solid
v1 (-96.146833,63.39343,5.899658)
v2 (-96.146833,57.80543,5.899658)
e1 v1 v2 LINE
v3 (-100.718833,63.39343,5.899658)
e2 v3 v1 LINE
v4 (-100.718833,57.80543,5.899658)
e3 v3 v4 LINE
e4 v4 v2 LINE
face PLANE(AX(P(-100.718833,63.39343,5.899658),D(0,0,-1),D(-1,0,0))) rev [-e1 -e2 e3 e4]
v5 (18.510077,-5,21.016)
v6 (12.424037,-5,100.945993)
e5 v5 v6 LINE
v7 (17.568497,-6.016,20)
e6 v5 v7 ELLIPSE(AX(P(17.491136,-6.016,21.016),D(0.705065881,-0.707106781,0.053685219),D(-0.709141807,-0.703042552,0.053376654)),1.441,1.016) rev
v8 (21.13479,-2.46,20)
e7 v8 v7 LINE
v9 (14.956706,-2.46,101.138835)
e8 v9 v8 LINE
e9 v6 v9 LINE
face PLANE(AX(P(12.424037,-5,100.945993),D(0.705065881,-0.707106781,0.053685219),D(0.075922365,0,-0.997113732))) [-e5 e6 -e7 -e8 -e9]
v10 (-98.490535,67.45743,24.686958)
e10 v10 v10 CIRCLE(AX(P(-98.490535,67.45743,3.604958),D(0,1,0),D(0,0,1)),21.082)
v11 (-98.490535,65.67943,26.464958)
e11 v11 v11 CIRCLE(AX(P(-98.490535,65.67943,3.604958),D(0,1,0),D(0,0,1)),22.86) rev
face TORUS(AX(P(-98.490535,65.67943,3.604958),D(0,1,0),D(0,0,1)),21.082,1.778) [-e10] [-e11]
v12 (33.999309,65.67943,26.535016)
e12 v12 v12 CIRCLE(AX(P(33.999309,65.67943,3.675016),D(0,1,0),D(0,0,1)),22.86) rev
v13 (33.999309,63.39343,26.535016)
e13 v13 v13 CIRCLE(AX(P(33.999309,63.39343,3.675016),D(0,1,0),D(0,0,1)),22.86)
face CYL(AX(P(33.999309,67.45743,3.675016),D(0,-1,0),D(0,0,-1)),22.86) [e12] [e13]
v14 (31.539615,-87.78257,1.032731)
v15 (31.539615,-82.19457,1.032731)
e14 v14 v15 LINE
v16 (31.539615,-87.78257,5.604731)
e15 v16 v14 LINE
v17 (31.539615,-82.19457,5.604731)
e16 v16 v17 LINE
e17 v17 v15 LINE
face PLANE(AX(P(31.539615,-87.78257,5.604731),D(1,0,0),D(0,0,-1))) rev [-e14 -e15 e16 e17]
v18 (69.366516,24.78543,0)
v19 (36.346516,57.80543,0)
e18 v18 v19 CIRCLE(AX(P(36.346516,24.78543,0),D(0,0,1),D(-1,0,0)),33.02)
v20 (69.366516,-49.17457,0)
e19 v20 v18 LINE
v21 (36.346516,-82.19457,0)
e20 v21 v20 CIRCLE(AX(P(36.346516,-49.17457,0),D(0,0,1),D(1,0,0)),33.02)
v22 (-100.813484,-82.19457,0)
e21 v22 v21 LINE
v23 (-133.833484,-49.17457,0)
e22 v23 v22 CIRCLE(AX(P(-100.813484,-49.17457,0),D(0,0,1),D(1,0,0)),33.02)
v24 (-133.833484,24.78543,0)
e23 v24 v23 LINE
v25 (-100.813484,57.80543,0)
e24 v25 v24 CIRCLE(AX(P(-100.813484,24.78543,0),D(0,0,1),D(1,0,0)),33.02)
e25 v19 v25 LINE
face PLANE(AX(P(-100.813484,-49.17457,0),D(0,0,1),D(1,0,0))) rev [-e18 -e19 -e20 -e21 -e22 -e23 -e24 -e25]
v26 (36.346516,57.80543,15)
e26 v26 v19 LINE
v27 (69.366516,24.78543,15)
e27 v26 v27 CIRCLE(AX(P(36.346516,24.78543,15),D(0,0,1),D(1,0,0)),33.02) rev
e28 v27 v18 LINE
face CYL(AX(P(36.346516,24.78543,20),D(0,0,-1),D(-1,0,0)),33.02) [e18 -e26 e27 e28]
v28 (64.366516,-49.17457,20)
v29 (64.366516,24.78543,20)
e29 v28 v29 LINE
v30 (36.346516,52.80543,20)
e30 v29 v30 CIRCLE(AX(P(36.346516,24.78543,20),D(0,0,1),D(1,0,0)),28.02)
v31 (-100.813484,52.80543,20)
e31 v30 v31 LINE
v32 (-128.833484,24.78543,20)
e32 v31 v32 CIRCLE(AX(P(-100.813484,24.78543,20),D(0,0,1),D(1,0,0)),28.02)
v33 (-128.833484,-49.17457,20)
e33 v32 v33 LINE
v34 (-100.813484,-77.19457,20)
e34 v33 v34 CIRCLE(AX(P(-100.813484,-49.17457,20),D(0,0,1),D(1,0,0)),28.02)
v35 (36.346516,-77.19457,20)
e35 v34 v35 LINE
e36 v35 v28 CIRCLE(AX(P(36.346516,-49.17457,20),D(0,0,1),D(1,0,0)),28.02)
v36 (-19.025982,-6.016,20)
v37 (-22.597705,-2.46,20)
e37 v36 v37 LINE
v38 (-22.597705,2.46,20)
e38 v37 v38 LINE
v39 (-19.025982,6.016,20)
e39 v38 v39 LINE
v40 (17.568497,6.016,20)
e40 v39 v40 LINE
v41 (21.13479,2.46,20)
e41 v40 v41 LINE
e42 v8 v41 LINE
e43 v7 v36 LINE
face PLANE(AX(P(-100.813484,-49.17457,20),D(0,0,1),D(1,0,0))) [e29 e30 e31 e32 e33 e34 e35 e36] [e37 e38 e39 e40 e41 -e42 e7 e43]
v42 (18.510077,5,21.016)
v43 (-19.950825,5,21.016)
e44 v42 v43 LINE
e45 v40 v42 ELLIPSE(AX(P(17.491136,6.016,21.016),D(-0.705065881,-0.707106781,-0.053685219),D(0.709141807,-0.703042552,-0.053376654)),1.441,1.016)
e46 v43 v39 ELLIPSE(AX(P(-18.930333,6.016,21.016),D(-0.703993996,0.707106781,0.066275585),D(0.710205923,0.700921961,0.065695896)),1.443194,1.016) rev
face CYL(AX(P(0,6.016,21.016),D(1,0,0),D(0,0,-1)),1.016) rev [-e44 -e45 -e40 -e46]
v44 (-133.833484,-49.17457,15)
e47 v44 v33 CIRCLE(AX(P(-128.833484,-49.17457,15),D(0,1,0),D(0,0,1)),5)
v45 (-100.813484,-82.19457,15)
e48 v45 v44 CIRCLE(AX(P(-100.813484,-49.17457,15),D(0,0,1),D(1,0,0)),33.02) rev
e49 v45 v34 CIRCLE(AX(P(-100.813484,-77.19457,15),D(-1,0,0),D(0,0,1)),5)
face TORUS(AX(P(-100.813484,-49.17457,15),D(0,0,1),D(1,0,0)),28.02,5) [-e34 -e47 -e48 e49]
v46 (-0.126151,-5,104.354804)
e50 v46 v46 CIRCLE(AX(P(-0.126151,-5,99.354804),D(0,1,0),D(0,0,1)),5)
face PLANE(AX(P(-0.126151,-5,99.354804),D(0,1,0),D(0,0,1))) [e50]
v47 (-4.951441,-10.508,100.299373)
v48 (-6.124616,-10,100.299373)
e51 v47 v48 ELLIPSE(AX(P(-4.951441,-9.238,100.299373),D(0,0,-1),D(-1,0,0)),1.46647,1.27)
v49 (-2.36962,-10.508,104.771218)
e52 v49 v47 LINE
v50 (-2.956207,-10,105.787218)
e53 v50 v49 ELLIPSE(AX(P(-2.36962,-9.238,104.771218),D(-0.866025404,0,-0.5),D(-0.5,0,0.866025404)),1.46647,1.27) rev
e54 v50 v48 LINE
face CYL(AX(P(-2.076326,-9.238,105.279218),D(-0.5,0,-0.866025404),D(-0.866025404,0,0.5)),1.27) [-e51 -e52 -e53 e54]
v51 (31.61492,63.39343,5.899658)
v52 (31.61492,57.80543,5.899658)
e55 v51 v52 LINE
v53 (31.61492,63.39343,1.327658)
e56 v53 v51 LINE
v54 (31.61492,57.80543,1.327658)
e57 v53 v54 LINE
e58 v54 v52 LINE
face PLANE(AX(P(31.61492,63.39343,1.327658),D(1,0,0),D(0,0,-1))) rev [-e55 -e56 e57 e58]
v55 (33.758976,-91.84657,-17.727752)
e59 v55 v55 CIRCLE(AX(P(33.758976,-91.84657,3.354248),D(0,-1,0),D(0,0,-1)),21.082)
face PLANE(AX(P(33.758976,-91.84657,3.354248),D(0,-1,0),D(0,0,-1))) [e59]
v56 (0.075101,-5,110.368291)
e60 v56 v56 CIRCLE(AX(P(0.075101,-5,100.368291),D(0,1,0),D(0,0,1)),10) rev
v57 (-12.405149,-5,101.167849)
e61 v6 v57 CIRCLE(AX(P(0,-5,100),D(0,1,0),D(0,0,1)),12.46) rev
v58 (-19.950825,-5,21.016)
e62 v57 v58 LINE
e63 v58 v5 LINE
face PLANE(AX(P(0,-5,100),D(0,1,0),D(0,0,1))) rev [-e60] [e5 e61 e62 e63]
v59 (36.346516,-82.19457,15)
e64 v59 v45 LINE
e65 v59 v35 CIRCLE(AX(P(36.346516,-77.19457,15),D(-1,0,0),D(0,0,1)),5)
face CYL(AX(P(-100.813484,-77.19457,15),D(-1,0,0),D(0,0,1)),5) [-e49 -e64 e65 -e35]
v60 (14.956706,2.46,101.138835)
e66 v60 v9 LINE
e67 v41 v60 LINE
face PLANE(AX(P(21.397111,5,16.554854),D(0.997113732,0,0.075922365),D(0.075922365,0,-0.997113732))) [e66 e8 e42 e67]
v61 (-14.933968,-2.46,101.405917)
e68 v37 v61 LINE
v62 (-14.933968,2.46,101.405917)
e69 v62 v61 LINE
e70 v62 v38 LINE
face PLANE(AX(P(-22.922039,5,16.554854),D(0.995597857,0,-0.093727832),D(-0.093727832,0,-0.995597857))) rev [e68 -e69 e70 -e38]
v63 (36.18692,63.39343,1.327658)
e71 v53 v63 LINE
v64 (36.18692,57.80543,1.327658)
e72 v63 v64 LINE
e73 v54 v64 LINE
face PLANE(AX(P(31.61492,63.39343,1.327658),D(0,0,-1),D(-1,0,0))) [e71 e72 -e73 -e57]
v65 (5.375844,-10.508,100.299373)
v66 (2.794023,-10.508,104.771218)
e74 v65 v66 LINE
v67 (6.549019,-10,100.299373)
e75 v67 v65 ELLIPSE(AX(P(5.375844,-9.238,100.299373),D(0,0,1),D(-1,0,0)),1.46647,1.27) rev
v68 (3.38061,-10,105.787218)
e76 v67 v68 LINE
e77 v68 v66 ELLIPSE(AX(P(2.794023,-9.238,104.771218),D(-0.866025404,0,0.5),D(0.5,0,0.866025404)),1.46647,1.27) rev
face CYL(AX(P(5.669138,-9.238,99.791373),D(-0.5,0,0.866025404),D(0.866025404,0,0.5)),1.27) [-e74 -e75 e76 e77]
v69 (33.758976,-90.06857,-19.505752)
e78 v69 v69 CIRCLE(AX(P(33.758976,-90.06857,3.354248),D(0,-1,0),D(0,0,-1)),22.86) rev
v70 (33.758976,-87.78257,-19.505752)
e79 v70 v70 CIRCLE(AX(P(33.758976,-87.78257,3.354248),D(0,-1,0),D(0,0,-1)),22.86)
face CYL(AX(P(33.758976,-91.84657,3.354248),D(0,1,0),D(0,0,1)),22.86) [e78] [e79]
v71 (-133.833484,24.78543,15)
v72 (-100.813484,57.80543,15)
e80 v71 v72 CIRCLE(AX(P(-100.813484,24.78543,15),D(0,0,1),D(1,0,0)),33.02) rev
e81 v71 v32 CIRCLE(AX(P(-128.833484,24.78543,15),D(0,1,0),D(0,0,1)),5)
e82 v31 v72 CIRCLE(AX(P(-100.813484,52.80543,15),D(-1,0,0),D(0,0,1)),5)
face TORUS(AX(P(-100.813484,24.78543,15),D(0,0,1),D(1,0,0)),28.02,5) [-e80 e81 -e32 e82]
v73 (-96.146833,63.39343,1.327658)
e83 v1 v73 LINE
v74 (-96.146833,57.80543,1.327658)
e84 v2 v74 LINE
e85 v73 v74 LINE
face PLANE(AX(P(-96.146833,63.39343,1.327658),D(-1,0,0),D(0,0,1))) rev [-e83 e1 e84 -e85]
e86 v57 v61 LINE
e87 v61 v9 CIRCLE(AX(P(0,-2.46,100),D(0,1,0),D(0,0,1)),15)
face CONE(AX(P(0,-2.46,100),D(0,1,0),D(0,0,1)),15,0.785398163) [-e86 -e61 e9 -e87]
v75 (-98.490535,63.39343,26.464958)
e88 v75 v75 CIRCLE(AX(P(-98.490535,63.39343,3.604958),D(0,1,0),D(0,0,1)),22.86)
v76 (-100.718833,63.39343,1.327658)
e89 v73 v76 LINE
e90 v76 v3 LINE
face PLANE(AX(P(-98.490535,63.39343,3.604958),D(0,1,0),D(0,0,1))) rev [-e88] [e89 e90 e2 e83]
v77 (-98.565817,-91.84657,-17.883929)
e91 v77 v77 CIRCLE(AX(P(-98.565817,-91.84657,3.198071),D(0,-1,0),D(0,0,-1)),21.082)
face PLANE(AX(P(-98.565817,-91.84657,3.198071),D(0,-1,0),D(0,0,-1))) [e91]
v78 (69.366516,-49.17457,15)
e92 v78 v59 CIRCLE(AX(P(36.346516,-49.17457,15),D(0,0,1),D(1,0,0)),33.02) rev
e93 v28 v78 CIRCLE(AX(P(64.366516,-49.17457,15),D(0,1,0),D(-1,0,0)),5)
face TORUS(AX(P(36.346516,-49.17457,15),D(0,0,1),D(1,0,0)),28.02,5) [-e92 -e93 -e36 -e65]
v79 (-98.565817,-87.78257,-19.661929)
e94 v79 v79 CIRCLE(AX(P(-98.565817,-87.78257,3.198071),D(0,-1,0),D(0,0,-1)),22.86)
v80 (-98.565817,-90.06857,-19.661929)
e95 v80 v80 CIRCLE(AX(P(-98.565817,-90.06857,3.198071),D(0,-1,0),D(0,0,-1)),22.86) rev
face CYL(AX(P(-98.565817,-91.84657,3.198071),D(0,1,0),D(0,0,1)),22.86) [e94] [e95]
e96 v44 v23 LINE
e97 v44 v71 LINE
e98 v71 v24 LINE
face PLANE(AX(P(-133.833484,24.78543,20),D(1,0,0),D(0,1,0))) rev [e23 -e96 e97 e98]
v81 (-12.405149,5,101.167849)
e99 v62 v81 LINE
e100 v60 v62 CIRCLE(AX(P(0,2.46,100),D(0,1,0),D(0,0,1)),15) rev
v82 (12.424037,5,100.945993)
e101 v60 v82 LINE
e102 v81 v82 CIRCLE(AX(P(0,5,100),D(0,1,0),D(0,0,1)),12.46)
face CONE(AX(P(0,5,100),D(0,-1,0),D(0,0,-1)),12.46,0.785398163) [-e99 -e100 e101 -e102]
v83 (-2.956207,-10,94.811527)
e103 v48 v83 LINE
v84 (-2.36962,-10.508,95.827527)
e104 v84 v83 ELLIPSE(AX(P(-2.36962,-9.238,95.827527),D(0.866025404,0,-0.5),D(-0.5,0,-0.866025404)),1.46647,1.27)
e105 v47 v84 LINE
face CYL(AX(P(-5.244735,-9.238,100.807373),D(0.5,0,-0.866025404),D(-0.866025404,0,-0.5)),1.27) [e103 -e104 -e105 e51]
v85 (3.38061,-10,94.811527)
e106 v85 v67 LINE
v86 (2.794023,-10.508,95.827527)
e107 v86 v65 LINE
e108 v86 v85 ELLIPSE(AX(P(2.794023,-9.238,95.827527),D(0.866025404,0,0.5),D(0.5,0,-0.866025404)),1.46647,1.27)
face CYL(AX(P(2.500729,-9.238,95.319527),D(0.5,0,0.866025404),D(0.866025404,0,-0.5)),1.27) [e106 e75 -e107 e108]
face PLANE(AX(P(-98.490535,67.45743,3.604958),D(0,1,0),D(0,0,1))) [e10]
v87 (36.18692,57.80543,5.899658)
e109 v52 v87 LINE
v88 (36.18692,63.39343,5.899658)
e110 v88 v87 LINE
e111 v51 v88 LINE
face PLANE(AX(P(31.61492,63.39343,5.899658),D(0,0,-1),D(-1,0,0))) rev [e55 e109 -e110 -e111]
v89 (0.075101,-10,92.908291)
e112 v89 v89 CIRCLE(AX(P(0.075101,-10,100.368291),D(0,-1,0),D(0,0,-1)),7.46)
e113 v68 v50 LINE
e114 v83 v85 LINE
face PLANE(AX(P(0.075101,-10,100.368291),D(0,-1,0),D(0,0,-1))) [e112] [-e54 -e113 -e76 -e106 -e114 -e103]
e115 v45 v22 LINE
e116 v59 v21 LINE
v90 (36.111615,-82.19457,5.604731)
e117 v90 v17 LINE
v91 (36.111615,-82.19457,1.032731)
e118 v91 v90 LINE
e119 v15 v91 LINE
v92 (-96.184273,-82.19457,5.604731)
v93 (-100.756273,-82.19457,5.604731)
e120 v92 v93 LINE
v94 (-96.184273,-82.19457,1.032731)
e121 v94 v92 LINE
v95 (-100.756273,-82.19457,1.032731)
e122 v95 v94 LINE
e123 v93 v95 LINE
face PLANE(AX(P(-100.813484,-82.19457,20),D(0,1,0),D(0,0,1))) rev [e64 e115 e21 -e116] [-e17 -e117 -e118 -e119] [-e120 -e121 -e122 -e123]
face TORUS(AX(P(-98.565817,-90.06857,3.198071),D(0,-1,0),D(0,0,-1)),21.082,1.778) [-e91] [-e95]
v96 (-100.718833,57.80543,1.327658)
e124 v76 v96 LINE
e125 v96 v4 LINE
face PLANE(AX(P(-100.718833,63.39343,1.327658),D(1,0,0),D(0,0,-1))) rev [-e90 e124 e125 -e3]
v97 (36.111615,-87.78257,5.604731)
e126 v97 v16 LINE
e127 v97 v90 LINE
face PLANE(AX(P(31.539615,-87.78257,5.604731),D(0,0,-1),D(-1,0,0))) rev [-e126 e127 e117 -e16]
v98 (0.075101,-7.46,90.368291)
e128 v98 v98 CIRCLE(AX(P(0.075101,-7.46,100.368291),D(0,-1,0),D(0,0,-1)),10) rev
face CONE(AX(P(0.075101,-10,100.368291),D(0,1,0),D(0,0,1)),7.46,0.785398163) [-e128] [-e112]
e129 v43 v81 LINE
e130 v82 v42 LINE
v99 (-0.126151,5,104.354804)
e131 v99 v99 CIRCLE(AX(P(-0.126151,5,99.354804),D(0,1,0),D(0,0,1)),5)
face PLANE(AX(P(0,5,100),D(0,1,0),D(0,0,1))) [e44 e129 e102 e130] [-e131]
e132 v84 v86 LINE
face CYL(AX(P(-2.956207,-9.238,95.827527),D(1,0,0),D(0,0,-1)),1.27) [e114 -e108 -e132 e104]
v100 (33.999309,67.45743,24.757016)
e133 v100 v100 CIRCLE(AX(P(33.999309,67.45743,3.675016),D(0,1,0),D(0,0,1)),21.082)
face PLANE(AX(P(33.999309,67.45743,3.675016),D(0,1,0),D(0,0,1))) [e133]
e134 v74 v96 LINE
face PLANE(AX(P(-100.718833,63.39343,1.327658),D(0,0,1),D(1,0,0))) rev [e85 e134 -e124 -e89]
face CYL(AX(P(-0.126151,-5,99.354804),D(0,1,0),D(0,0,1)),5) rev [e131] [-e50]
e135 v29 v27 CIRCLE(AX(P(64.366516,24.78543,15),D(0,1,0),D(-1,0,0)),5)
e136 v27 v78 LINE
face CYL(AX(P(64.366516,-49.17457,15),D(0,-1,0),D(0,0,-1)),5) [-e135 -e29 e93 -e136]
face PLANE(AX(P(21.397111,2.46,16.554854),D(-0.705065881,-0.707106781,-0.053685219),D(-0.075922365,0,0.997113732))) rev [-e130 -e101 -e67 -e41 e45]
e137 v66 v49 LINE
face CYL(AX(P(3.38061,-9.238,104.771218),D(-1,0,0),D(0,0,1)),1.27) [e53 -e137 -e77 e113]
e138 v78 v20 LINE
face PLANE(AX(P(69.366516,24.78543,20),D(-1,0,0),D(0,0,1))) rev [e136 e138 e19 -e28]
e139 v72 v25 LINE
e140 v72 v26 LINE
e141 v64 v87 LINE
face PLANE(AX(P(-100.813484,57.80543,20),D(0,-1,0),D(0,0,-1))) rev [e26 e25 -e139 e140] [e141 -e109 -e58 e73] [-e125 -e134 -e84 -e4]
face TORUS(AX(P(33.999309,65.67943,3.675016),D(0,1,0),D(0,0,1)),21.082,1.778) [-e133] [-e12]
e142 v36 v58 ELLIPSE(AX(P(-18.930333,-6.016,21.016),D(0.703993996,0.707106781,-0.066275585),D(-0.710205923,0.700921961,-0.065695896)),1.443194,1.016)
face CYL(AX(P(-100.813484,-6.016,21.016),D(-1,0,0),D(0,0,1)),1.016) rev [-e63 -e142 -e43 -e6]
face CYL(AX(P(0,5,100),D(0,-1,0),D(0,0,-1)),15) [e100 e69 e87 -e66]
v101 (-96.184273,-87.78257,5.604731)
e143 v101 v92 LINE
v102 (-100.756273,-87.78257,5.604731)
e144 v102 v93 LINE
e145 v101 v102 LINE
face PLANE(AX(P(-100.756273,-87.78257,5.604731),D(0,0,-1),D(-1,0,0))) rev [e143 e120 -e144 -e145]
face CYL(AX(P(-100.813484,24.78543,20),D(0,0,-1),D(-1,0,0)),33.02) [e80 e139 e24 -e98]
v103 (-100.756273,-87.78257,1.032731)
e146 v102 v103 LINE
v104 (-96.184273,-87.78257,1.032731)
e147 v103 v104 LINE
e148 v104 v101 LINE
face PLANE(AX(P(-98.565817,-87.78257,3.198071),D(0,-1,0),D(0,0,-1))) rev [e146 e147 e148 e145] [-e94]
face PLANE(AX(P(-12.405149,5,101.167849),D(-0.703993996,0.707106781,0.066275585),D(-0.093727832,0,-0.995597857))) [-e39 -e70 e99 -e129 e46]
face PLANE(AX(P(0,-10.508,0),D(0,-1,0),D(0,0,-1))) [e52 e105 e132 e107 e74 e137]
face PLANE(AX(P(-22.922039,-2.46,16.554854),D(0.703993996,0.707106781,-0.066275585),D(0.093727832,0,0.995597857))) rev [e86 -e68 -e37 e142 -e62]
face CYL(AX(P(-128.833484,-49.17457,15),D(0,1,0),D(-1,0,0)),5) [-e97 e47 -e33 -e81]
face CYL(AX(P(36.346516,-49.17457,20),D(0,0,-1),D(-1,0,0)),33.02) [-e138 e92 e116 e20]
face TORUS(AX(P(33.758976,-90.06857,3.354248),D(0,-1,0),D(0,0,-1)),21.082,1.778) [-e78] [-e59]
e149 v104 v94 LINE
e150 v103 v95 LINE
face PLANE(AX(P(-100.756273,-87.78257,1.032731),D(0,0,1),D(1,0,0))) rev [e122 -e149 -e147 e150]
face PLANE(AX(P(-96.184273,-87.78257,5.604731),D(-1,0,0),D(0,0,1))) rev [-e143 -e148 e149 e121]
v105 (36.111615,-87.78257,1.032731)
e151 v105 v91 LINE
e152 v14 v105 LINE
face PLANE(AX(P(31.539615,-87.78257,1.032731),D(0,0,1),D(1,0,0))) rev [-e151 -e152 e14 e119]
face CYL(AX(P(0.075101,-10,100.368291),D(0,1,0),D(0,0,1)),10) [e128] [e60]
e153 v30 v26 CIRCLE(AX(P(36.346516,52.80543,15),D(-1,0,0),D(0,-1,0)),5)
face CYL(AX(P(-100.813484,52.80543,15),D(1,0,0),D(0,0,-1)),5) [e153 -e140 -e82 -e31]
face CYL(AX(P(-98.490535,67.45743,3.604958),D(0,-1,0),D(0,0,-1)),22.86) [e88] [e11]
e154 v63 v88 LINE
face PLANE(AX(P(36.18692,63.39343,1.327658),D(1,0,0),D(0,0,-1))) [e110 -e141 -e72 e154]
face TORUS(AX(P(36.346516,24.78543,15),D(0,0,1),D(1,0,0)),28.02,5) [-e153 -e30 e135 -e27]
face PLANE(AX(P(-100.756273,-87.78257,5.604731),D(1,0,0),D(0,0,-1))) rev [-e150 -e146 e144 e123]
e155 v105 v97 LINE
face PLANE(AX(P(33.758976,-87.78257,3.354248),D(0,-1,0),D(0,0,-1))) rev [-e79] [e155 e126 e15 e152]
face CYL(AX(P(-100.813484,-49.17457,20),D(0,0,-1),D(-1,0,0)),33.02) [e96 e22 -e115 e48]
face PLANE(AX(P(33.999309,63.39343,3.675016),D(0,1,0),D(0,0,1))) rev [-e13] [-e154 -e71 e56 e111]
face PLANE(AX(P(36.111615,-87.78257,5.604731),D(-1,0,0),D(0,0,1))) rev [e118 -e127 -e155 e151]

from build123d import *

# Parameters (mm, degrees)
BOSS_EXTRUDE1_DEPTH  = 20
FILLET1_R            = 5
BOSS_EXTRUDE10_DEPTH = 5
CHAMFER1_SIZE        = 2.54
CHAMFER2_SIZE        = 2.54
SKETCH13_R           = 10
BOSS_EXTRUDE11_DEPTH = 5
SKETCH14_R           = 5
CUT_EXTRUDE1_DEPTH   = 10
CHAMFER3_SIZE        = 2.54
FILLET5_R            = 1.016
BOSS_EXTRUDE13_DEPTH = 0.508
FILLET6_R            = 1.27
SKETCH16_W           = 4.572
SKETCH16_H           = 4.572
BOSS_EXTRUDE14_DEPTH = 5.588
SKETCH17_W           = 4.572
SKETCH17_H           = 4.572
BOSS_EXTRUDE15_DEPTH = 5.588
SKETCH18_W           = 4.572
SKETCH18_H           = 4.572
BOSS_EXTRUDE16_DEPTH = 5.588
SKETCH19_W           = 4.572
SKETCH19_H           = 4.572
BOSS_EXTRUDE17_DEPTH = 5.588
SKETCH20_R           = 22.86
BOSS_EXTRUDE18_DEPTH = 4.064
SKETCH21_R           = 22.86
BOSS_EXTRUDE19_DEPTH = 4.064
SKETCH22_R           = 22.86
BOSS_EXTRUDE20_DEPTH = 4.064
SKETCH23_R           = 22.86
BOSS_EXTRUDE21_DEPTH = 4.064
FILLET7_R            = 1.778


with BuildPart() as part:
    # Sketch1 → Boss-Extrude1 (new body)
    with BuildSketch(Plane.XY):
        with BuildLine():
            Line((-100.813484163, 57.805429864), (36.346515837, 57.805429864))
            ThreePointArc((36.346515837, 57.805429864), (59.695181752, 48.134095779), (69.366515837, 24.785429864))
            Line((69.366515837, 24.785429864), (69.366515837, -49.174570136))
            ThreePointArc((69.366515837, -49.174570136), (59.695181752, -72.523236051), (36.346515837, -82.194570136))
            Line((36.346515837, -82.194570136), (-100.813484163, -82.194570136))
            ThreePointArc((-100.813484163, -82.194570136), (-124.162150078, -72.523236051), (-133.833484163, -49.174570136))
            Line((-133.833484163, -49.174570136), (-133.833484163, 24.785429864))
            ThreePointArc((-133.833484163, 24.785429864), (-124.162150078, 48.134095779), (-100.813484163, 57.805429864))
        make_face()
    extrude(amount=BOSS_EXTRUDE1_DEPTH)

    # Fillet1
    fillet1_edges = [part.edges().sort_by_distance(p)[0] for p in [
        (59.695181752, -72.523236051, 20),
        (69.366515837, -12.194570136, 20),
        (59.695181752, 48.134095779, 20),
        (-32.233484163, 57.805429864, 20),
        (-124.162150078, 48.134095779, 20),
        (-133.833484163, -12.194570136, 20),
        (-124.162150078, -72.523236051, 20),
        (-32.233484163, -82.194570136, 20),
    ]]
    fillet(fillet1_edges, radius=FILLET1_R)

    # Sketch12 → Boss-Extrude10 (add, symmetric)
    with BuildSketch(Plane(origin=(0, 0, 0), x_dir=(1, 0, 0), z_dir=(0, 1, 0))):
        with BuildLine():
            Line((21.397110645, -16.554854198), (14.956705979, -101.138835481))
            ThreePointArc((14.956705979, -101.138835481), (0.134024079, -114.99940124), (-14.93396786, -101.405917476))
            Line((-14.93396786, -101.405917476), (-22.922038671, -16.554854198))
            Line((-22.922038671, -16.554854198), (21.397110645, -16.554854198))
        make_face()
    extrude(amount=BOSS_EXTRUDE10_DEPTH, both=True)

    # Chamfer1
    chamfer1_edges = [part.edges().sort_by_distance(p)[0] for p in [
        (-18.765836361, -5, 60.702958738),
        (0.134024079, -5, 114.99940124),
        (18.045747939, -5, 60.56941774),
    ]]
    chamfer(chamfer1_edges, length=CHAMFER1_SIZE)

    # Chamfer2
    chamfer2_edges = [part.edges().sort_by_distance(p)[0] for p in [
        (18.045747939, 5, 60.56941774),
        (-18.765836361, 5, 60.702958738),
        (0.134024079, 5, 114.99940124),
    ]]
    chamfer(chamfer2_edges, length=CHAMFER2_SIZE)

    # Sketch13 → Boss-Extrude11 (add)
    with BuildSketch(Plane.XZ.offset(5)):
        with Locations(Location((0.07510091, 100.368291043, 0), (0, 0, 90))):
            Circle(SKETCH13_R)
    extrude(amount=BOSS_EXTRUDE11_DEPTH)

    # Sketch14 → Cut-Extrude1 (cut)
    with BuildSketch(Plane(origin=(0, 5, 0), x_dir=(1, 0, 0), z_dir=(0, 1, 0))):
        with Locations(Location((-0.126150579, -99.354804297, 0), (0, 0, 270))):
            Circle(SKETCH14_R)
    extrude(amount=-CUT_EXTRUDE1_DEPTH, mode=Mode.SUBTRACT)

    # Chamfer3
    chamfer3_edges = [part.edges().sort_by_distance(p)[0] for p in [
        (0.07510091, -10, 90.368291043),
    ]]
    chamfer(chamfer3_edges, length=CHAMFER3_SIZE)

    # Fillet5
    fillet5_edges = [part.edges().sort_by_distance(p)[0] for p in [
        (-0.729518211, -5, 20),
        (-0.729518211, 5, 20),
    ]]
    fillet(fillet5_edges, radius=FILLET5_R)

    # Sketch15 → Boss-Extrude13 (add)
    with BuildSketch(Plane.XZ.offset(10)):
        Polygon((3.380610396, 94.811527333), (6.549019318, 100.299372565), (3.380610396, 105.787217797), (-2.956207448, 105.787217797), (-6.124616369, 100.299372565), (-2.956207448, 94.811527333), align=None)
    extrude(amount=BOSS_EXTRUDE13_DEPTH)

    # Fillet6
    # the kernel refuses this fillet: 1.27 mm, written as the material it takes off along each edge
    with BuildSketch(Plane(origin=(2.110610396, -10.508, 92.611822807), x_dir=(0, 1, 0), z_dir=(0.4999999999999995, 0, 0.866025403784439)), Plane(origin=(-5.496207448, -10.508, 94.811527333), x_dir=(0, 1, 0), z_dir=(1, 0, 0)), Plane(origin=(-7.394616369, -10.508, 102.49907709), x_dir=(0, 1, 0), z_dir=(0.4999999999999989, 0, -0.8660254037844393)), Plane(origin=(-1.686207448, -10.508, 107.986922322), x_dir=(0, 1, 0), z_dir=(-0.5000000000000007, 0, -0.8660254037844383)), Plane(origin=(5.920610396, -10.508, 105.787217797), x_dir=(0, 1, 0), z_dir=(-1, 0, 0)), Plane(origin=(7.819019318, -10.508, 98.099668039), x_dir=(0, 1, 0), z_dir=(-0.5000000000000001, 0, 0.8660254037844386))) as fillet6_piece_1:
        with BuildLine():
            CenterArc((1.27, 1.016), FILLET6_R, 180, 53.130102354)
            Line((0, 1.016), (-0.0254, 1.016))
            Line((-0.0254, 1.016), (-0.0254, 0))
            Line((-0.0254, 0), (0, -0.0254))
            ThreePointArc((0, -0.0254), (0.254, -0.0254), (0.49276, -0.02032))
            Line((0.49276, -0.02032), (0.508, 0))
        make_face()
    extrude(amount=11.416817844, mode=Mode.SUBTRACT)

    # Sketch16 → Boss-Extrude14 (add)
    with BuildSketch(Plane.XZ.offset(82.194570136)):
        with Locations((-98.470273104, 3.318730991)):
            Rectangle(SKETCH16_W, SKETCH16_H)
    extrude(amount=BOSS_EXTRUDE14_DEPTH)

    # Sketch17 → Boss-Extrude15 (add)
    with BuildSketch(Plane.XZ.offset(82.194570136)):
        with Locations((33.825615308, 3.318730991)):
            Rectangle(SKETCH17_W, SKETCH17_H)
    extrude(amount=BOSS_EXTRUDE15_DEPTH)

    # Sketch18 → Boss-Extrude16 (add)
    with BuildSketch(Plane(origin=(0, 57.805429864, 0), x_dir=(1, 0, 0), z_dir=(0, 1, 0))):
        with Locations((-98.432832856, -3.613657702)):
            Rectangle(SKETCH18_W, SKETCH18_H)
    extrude(amount=BOSS_EXTRUDE16_DEPTH)

    # Sketch19 → Boss-Extrude17 (add)
    with BuildSketch(Plane(origin=(0, 57.805429864, 0), x_dir=(1, 0, 0), z_dir=(0, 1, 0))):
        with Locations((33.90091989, -3.613657702)):
            Rectangle(SKETCH19_W, SKETCH19_H)
    extrude(amount=BOSS_EXTRUDE17_DEPTH)

    # Sketch20 → Boss-Extrude18 (add)
    with BuildSketch(Plane.XZ.offset(87.782570136)):
        with Locations(Location((-98.565816777, 3.198071139, 0), (0, 0, 270))):
            Circle(SKETCH20_R)
    extrude(amount=BOSS_EXTRUDE18_DEPTH)

    # Sketch21 → Boss-Extrude19 (add)
    with BuildSketch(Plane.XZ.offset(87.782570136)):
        with Locations(Location((33.758975708, 3.354248453, 0), (0, 0, 270))):
            Circle(SKETCH21_R)
    extrude(amount=BOSS_EXTRUDE19_DEPTH)

    # Sketch22 → Boss-Extrude20 (add)
    with BuildSketch(Plane(origin=(0, 63.393429864, 0), x_dir=(1, 0, 0), z_dir=(0, 1, 0))):
        with Locations(Location((33.999309206, -3.675015511, 0), (0, 0, 270))):
            Circle(SKETCH22_R)
    extrude(amount=BOSS_EXTRUDE20_DEPTH)

    # Sketch23 → Boss-Extrude21 (add)
    with BuildSketch(Plane(origin=(0, 63.393429864, 0), x_dir=(1, 0, 0), z_dir=(0, 1, 0))):
        with Locations(Location((-98.490534762, -3.604957743, 0), (0, 0, 270))):
            Circle(SKETCH23_R)
    extrude(amount=BOSS_EXTRUDE21_DEPTH)

    # Fillet7
    fillet7_edges = [part.edges().sort_by_distance(p)[0] for p in [
        (-98.565816777, -91.846570136, 26.058071139),
        (33.758975708, -91.846570136, 26.214248453),
        (33.999309206, 67.457429864, -19.184984489),
        (-98.490534762, 67.457429864, -19.255042257),
    ]]
    fillet(fillet7_edges, radius=FILLET7_R)


solid = part.part
